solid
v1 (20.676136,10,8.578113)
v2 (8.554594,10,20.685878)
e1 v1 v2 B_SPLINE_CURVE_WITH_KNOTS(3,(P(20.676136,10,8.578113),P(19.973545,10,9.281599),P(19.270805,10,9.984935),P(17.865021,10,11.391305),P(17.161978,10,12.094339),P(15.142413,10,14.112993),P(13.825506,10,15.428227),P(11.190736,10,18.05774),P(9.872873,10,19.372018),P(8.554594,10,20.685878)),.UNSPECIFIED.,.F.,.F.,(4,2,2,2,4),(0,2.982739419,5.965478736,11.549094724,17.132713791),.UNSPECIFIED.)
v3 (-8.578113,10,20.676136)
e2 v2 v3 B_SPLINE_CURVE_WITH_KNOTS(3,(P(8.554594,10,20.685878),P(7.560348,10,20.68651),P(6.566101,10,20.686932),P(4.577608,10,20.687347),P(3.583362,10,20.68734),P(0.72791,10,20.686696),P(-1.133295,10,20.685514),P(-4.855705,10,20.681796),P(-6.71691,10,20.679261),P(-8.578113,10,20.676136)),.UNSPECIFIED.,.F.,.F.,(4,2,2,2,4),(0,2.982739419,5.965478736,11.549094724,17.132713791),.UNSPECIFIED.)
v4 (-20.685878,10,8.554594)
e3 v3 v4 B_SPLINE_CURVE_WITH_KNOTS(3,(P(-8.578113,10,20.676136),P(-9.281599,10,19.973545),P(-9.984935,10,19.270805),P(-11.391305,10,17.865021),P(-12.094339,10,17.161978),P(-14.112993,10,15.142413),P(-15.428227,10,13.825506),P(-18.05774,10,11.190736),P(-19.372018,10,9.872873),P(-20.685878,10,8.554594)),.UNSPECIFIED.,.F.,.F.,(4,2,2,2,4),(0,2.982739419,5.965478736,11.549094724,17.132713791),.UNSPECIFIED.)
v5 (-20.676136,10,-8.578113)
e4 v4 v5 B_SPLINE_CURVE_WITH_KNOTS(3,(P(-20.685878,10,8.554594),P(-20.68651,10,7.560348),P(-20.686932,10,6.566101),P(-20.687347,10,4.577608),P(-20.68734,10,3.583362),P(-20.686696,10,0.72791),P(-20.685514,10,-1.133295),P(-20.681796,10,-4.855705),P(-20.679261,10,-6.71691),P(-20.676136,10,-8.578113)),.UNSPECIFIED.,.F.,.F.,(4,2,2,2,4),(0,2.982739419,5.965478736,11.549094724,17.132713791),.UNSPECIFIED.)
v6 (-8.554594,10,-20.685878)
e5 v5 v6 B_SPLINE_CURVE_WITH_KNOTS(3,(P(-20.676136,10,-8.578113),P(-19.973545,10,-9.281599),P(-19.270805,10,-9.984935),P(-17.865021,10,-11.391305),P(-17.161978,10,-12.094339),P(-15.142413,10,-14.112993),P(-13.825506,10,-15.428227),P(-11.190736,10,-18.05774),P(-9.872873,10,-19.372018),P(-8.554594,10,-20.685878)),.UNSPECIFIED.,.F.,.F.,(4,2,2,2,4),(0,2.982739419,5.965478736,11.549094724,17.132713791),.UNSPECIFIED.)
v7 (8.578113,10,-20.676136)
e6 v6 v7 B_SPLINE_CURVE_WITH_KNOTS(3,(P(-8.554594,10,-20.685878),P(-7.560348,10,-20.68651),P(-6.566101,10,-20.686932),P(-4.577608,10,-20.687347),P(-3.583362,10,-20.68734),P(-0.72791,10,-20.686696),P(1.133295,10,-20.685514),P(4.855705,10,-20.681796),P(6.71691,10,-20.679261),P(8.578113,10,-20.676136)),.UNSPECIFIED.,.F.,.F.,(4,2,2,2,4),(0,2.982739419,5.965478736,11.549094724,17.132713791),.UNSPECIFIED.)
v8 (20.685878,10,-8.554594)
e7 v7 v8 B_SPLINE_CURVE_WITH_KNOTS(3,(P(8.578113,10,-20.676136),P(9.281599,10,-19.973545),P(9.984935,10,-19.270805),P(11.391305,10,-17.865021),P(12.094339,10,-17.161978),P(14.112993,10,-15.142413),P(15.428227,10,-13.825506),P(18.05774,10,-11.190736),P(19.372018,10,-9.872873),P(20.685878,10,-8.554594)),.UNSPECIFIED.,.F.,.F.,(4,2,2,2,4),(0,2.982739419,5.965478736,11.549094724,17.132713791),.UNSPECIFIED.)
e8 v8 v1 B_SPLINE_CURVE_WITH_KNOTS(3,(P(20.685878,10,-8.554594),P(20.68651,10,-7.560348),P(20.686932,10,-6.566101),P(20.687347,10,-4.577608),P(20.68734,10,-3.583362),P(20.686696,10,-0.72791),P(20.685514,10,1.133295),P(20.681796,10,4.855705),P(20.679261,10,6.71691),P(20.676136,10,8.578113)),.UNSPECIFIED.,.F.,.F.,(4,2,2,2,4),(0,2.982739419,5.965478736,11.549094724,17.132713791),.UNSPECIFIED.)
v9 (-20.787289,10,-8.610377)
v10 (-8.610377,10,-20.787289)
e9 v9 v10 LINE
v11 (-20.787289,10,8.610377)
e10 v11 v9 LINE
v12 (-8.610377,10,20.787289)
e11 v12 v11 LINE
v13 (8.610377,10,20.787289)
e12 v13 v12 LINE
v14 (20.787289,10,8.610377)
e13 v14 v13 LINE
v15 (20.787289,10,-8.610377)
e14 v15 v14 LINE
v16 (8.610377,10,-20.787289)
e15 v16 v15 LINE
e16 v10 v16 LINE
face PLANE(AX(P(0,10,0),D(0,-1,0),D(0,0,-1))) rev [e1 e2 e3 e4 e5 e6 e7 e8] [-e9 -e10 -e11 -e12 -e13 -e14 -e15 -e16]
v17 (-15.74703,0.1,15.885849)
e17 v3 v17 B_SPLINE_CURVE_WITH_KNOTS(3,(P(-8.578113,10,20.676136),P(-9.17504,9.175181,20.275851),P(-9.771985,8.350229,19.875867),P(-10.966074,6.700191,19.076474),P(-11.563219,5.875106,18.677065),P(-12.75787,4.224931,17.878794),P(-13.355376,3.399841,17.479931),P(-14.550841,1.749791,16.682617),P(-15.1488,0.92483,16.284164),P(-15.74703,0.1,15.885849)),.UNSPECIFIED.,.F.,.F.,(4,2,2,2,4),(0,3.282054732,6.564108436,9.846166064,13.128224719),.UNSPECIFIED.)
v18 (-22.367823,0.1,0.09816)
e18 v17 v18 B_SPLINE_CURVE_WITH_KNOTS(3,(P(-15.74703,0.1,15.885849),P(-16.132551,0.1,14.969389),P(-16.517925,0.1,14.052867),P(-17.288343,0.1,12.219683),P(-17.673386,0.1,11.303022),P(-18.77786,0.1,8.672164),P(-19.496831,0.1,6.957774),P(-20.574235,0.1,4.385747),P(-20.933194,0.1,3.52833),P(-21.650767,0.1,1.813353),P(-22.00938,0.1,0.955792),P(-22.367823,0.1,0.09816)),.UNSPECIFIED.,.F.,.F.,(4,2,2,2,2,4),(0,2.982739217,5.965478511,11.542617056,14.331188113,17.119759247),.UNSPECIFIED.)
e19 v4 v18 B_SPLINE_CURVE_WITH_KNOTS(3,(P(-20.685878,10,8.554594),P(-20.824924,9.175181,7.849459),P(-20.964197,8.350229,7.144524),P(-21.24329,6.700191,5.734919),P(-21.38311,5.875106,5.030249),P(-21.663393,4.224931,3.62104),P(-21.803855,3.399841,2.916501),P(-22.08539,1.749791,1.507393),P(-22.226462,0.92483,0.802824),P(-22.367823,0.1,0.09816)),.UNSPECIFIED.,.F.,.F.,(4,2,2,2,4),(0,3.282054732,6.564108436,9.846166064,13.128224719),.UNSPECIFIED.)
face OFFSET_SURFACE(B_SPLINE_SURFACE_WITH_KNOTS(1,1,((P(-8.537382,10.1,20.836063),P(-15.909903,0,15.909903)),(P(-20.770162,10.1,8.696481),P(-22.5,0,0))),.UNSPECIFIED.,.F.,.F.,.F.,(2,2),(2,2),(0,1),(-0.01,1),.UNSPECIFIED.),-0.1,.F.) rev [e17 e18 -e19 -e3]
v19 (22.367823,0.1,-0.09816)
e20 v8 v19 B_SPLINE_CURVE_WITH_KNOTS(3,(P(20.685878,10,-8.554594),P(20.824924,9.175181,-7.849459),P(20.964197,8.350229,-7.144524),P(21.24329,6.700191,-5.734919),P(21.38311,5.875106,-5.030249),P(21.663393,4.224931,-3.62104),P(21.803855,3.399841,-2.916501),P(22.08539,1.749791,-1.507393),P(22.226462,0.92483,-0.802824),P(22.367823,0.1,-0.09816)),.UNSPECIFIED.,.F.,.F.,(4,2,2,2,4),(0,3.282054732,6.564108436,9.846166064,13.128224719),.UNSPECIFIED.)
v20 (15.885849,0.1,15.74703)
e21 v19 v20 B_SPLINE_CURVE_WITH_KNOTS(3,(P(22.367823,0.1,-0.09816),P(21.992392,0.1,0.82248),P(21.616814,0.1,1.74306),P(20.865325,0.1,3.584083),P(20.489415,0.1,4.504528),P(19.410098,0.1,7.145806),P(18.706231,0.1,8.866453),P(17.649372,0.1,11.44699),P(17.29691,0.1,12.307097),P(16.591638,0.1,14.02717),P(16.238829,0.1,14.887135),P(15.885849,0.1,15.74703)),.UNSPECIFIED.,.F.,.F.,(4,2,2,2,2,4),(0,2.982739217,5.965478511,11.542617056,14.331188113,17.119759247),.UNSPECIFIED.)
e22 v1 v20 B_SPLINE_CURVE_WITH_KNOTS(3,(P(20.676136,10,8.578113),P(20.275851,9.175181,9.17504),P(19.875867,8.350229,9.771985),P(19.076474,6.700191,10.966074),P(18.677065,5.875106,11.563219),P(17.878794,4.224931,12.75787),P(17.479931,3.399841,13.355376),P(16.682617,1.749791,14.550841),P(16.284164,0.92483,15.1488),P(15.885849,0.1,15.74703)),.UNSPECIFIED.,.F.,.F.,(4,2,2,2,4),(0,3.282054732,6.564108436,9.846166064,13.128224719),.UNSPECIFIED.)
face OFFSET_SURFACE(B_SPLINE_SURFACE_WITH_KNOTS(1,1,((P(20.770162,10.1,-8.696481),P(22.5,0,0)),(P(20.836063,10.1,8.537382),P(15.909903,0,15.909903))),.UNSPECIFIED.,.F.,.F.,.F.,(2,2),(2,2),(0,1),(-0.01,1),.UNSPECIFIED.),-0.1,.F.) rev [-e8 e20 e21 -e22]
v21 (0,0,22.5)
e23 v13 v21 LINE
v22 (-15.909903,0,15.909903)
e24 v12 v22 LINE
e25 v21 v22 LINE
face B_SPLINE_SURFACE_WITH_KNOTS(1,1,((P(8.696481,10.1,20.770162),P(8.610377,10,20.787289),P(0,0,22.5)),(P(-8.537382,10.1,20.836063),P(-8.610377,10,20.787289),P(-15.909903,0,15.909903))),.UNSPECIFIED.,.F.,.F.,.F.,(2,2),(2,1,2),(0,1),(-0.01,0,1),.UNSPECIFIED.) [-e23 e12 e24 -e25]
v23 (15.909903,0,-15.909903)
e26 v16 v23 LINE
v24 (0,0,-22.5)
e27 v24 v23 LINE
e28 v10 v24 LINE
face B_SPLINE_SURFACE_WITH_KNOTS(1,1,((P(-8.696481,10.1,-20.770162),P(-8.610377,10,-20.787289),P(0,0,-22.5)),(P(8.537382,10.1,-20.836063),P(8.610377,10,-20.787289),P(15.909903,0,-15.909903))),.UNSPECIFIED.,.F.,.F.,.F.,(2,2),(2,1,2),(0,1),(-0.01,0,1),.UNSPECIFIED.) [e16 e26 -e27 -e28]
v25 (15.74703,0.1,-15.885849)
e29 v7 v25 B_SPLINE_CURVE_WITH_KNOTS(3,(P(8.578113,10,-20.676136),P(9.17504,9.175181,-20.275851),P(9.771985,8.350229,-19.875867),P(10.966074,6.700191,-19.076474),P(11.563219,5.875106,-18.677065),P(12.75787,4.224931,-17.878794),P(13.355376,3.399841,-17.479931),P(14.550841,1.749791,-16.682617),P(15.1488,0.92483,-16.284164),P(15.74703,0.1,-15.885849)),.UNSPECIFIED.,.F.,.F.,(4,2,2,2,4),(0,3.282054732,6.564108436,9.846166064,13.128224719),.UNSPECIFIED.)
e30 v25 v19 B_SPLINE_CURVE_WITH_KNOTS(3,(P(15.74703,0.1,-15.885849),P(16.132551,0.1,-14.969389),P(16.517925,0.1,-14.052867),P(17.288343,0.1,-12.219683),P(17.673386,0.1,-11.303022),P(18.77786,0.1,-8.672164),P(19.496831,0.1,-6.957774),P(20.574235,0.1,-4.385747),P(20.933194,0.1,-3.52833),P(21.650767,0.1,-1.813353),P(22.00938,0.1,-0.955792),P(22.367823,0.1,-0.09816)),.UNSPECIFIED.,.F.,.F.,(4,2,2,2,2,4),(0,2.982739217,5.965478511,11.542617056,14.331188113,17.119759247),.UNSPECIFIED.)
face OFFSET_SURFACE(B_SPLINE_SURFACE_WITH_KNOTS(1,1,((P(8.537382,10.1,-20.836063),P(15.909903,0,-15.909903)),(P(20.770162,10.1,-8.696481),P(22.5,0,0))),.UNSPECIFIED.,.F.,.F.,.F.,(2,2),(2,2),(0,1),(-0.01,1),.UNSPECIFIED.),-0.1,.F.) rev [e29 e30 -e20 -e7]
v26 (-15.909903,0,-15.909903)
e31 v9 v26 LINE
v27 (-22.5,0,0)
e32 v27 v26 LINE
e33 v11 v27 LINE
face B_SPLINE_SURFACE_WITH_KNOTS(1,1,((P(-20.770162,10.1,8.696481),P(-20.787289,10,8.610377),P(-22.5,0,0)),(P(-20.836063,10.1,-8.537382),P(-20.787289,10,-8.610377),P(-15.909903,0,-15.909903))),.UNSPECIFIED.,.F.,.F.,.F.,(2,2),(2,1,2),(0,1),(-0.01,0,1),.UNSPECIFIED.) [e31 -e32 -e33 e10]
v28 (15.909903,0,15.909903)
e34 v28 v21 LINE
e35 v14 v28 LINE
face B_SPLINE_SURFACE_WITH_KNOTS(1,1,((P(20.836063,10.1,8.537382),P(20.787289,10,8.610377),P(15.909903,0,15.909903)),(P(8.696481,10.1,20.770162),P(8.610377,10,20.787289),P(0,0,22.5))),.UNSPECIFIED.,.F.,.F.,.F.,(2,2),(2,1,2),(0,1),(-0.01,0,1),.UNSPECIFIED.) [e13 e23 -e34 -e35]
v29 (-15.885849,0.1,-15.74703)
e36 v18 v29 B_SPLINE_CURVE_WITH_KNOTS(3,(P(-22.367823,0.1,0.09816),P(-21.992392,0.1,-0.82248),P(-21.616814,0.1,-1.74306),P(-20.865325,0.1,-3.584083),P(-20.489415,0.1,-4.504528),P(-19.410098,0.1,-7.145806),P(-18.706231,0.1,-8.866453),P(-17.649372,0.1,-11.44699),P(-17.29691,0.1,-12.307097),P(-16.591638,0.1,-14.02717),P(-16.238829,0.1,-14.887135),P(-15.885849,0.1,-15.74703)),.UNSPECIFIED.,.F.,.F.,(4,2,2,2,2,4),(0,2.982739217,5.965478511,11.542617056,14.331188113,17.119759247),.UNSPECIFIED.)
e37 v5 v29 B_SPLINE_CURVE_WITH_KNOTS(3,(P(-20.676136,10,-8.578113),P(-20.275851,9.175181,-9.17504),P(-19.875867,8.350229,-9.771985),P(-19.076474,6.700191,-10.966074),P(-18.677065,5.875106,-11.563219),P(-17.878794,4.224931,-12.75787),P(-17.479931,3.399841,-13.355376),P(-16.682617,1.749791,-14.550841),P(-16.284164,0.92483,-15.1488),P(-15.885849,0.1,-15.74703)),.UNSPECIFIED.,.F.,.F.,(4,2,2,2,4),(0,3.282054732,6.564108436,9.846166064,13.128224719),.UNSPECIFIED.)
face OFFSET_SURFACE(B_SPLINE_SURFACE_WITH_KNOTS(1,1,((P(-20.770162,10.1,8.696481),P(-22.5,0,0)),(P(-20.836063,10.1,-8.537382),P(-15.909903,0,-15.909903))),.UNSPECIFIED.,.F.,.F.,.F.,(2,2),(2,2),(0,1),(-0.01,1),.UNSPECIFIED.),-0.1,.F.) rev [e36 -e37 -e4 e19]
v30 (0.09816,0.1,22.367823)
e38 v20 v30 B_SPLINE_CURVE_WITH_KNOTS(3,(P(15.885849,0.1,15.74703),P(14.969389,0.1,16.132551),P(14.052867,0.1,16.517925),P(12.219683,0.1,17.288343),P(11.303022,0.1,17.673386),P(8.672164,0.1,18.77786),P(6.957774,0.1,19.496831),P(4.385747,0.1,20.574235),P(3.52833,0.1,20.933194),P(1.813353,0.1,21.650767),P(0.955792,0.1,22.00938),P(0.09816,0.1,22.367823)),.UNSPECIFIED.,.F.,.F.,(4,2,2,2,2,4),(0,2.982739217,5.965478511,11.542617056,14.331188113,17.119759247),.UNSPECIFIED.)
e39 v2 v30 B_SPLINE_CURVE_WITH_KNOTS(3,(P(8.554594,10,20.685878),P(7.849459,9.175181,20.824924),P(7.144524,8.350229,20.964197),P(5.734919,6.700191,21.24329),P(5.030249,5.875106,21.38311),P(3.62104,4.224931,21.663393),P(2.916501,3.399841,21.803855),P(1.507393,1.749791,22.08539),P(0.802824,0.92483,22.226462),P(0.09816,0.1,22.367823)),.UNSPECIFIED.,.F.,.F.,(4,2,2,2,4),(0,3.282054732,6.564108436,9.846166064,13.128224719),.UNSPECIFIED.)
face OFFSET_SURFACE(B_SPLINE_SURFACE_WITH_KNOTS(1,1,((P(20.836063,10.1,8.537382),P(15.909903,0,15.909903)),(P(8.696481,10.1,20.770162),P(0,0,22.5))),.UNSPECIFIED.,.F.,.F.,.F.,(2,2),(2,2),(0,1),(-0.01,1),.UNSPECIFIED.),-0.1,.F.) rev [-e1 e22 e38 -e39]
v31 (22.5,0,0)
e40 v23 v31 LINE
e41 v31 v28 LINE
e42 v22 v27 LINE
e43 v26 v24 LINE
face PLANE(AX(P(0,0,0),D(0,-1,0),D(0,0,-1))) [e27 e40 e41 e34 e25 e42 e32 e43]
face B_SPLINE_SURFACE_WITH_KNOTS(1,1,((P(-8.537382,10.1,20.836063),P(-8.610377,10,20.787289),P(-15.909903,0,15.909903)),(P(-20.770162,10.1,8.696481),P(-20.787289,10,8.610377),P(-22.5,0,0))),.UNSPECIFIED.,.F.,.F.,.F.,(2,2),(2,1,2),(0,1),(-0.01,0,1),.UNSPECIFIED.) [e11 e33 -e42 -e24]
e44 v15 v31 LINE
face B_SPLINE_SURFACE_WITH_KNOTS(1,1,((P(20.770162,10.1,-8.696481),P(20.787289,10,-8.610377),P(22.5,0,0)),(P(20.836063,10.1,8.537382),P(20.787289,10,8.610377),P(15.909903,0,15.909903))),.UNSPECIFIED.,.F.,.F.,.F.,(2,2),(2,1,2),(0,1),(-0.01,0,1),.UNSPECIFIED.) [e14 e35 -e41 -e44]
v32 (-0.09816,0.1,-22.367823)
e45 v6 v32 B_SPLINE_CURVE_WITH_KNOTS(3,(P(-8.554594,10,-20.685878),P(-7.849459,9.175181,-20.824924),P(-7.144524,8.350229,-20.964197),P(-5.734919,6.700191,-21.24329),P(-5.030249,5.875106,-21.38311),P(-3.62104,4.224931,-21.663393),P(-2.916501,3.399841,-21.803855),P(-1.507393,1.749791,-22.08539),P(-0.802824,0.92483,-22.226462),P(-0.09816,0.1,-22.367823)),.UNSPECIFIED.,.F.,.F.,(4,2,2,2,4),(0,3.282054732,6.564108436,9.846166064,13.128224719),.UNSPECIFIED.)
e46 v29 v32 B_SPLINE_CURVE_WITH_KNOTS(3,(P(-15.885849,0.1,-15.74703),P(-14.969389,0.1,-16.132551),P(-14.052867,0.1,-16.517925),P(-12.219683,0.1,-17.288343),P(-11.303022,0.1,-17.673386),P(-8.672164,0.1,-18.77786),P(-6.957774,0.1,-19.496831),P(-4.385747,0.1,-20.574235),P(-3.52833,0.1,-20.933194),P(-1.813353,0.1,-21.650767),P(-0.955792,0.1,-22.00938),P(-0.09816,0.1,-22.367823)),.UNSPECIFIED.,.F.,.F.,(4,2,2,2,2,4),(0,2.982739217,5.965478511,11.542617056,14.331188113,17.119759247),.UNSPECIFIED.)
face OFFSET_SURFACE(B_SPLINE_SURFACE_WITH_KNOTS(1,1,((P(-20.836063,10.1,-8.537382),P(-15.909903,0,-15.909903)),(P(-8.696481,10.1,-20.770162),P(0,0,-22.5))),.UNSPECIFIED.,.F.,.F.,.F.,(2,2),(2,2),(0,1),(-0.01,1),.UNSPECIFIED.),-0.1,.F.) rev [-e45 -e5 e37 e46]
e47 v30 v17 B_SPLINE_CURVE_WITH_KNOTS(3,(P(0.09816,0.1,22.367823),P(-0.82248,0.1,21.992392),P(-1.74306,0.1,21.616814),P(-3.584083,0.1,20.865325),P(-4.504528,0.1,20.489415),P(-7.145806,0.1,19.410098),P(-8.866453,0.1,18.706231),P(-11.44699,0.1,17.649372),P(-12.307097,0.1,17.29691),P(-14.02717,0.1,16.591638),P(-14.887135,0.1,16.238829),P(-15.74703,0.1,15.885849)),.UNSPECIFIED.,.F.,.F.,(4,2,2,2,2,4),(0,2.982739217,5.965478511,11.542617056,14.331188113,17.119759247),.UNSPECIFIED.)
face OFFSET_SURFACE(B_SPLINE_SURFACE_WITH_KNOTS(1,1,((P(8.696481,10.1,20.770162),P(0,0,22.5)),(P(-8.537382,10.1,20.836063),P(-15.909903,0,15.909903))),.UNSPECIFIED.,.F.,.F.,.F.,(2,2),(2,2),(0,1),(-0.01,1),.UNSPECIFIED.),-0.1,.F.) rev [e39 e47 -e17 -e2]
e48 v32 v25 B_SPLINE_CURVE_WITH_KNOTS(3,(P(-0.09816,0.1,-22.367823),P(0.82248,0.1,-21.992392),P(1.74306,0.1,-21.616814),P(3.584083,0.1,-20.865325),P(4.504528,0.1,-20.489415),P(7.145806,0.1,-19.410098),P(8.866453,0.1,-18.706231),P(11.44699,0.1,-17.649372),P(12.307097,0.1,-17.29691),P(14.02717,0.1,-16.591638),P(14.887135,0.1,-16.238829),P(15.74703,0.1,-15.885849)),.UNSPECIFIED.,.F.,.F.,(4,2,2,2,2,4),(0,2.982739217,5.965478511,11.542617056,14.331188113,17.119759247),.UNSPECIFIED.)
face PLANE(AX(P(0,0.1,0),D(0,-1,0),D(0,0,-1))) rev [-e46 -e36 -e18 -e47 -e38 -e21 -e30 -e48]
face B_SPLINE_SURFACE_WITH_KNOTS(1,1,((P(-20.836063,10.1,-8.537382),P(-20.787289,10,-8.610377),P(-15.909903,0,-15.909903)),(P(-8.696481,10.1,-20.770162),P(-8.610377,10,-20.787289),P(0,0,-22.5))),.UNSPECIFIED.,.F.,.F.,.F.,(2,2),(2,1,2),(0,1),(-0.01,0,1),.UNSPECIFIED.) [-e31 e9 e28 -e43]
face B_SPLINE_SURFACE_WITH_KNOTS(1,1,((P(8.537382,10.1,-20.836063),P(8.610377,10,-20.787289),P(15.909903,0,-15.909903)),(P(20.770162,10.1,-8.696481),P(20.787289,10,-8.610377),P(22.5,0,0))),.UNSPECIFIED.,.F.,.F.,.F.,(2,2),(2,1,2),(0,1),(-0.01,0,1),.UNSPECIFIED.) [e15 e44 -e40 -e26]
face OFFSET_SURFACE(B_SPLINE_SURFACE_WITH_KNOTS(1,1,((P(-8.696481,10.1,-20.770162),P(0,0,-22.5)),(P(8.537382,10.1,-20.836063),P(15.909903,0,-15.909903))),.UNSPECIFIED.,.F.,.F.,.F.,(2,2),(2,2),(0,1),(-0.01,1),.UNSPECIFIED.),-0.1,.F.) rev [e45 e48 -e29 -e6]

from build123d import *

# Parameters (mm, degrees)
SHELL3_T = -0.1


with BuildPart() as part:
    # Boundary1: read off the stored shape, not the designer's step
    # Boundary1: loft between two sections, ruled curve by curve
    boundary1_from = [
        Edge.make_bspline([(-20.787289482, 10, -8.610377228), (-8.610377228, 10, -20.787289482)], [0, 0, 1, 1], 1),
        Edge.make_bspline([(-8.610377228, 10, -20.787289482), (8.610377228, 10, -20.787289482)], [0, 0, 1, 1], 1),
        Edge.make_bspline([(8.610377228, 10, -20.787289482), (20.787289482, 10, -8.610377228)], [0, 0, 1, 1], 1),
        Edge.make_bspline([(20.787289482, 10, -8.610377228), (20.787289482, 10, 8.610377228)], [0, 0, 1, 1], 1),
        Edge.make_bspline([(20.787289482, 10, 8.610377228), (8.610377228, 10, 20.787289482)], [0, 0, 1, 1], 1),
        Edge.make_bspline([(8.610377228, 10, 20.787289482), (-8.610377228, 10, 20.787289482)], [0, 0, 1, 1], 1),
        Edge.make_bspline([(-8.610377228, 10, 20.787289482), (-20.787289482, 10, 8.610377228)], [0, 0, 1, 1], 1),
        Edge.make_bspline([(-20.787289482, 10, 8.610377228), (-20.787289482, 10, -8.610377228)], [0, 0, 1, 1], 1),
    ]
    boundary1_to = [
        Edge.make_bspline([(-15.909902577, 0, -15.909902577), (0, 0, -22.5)], [0, 0, 1, 1], 1),
        Edge.make_bspline([(0, 0, -22.5), (15.909902577, 0, -15.909902577)], [0, 0, 1, 1], 1),
        Edge.make_bspline([(15.909902577, 0, -15.909902577), (22.5, 0, 0)], [0, 0, 1, 1], 1),
        Edge.make_bspline([(22.5, 0, 0), (15.909902577, 0, 15.909902577)], [0, 0, 1, 1], 1),
        Edge.make_bspline([(15.909902577, 0, 15.909902577), (0, 0, 22.5)], [0, 0, 1, 1], 1),
        Edge.make_bspline([(0, 0, 22.5), (-15.909902577, 0, 15.909902577)], [0, 0, 1, 1], 1),
        Edge.make_bspline([(-15.909902577, 0, 15.909902577), (-22.5, 0, 0)], [0, 0, 1, 1], 1),
        Edge.make_bspline([(-22.5, 0, 0), (-15.909902577, 0, -15.909902577)], [0, 0, 1, 1], 1),
    ]
    boundary1 = Solid(Shell([*[Face.make_surface_from_curves(boundary1_from[k], boundary1_to[k]) for k in range(8)], Face(Wire(boundary1_from)), Face(Wire(boundary1_to))]))
    add(boundary1)

    # Shell3
    shell3_openings = [part.faces().sort_by_distance(p)[0] for p in [
        (0, 10, 0),
    ]]
    offset(amount=SHELL3_T, openings=shell3_openings, kind=Kind.INTERSECTION)


solid = part.part
